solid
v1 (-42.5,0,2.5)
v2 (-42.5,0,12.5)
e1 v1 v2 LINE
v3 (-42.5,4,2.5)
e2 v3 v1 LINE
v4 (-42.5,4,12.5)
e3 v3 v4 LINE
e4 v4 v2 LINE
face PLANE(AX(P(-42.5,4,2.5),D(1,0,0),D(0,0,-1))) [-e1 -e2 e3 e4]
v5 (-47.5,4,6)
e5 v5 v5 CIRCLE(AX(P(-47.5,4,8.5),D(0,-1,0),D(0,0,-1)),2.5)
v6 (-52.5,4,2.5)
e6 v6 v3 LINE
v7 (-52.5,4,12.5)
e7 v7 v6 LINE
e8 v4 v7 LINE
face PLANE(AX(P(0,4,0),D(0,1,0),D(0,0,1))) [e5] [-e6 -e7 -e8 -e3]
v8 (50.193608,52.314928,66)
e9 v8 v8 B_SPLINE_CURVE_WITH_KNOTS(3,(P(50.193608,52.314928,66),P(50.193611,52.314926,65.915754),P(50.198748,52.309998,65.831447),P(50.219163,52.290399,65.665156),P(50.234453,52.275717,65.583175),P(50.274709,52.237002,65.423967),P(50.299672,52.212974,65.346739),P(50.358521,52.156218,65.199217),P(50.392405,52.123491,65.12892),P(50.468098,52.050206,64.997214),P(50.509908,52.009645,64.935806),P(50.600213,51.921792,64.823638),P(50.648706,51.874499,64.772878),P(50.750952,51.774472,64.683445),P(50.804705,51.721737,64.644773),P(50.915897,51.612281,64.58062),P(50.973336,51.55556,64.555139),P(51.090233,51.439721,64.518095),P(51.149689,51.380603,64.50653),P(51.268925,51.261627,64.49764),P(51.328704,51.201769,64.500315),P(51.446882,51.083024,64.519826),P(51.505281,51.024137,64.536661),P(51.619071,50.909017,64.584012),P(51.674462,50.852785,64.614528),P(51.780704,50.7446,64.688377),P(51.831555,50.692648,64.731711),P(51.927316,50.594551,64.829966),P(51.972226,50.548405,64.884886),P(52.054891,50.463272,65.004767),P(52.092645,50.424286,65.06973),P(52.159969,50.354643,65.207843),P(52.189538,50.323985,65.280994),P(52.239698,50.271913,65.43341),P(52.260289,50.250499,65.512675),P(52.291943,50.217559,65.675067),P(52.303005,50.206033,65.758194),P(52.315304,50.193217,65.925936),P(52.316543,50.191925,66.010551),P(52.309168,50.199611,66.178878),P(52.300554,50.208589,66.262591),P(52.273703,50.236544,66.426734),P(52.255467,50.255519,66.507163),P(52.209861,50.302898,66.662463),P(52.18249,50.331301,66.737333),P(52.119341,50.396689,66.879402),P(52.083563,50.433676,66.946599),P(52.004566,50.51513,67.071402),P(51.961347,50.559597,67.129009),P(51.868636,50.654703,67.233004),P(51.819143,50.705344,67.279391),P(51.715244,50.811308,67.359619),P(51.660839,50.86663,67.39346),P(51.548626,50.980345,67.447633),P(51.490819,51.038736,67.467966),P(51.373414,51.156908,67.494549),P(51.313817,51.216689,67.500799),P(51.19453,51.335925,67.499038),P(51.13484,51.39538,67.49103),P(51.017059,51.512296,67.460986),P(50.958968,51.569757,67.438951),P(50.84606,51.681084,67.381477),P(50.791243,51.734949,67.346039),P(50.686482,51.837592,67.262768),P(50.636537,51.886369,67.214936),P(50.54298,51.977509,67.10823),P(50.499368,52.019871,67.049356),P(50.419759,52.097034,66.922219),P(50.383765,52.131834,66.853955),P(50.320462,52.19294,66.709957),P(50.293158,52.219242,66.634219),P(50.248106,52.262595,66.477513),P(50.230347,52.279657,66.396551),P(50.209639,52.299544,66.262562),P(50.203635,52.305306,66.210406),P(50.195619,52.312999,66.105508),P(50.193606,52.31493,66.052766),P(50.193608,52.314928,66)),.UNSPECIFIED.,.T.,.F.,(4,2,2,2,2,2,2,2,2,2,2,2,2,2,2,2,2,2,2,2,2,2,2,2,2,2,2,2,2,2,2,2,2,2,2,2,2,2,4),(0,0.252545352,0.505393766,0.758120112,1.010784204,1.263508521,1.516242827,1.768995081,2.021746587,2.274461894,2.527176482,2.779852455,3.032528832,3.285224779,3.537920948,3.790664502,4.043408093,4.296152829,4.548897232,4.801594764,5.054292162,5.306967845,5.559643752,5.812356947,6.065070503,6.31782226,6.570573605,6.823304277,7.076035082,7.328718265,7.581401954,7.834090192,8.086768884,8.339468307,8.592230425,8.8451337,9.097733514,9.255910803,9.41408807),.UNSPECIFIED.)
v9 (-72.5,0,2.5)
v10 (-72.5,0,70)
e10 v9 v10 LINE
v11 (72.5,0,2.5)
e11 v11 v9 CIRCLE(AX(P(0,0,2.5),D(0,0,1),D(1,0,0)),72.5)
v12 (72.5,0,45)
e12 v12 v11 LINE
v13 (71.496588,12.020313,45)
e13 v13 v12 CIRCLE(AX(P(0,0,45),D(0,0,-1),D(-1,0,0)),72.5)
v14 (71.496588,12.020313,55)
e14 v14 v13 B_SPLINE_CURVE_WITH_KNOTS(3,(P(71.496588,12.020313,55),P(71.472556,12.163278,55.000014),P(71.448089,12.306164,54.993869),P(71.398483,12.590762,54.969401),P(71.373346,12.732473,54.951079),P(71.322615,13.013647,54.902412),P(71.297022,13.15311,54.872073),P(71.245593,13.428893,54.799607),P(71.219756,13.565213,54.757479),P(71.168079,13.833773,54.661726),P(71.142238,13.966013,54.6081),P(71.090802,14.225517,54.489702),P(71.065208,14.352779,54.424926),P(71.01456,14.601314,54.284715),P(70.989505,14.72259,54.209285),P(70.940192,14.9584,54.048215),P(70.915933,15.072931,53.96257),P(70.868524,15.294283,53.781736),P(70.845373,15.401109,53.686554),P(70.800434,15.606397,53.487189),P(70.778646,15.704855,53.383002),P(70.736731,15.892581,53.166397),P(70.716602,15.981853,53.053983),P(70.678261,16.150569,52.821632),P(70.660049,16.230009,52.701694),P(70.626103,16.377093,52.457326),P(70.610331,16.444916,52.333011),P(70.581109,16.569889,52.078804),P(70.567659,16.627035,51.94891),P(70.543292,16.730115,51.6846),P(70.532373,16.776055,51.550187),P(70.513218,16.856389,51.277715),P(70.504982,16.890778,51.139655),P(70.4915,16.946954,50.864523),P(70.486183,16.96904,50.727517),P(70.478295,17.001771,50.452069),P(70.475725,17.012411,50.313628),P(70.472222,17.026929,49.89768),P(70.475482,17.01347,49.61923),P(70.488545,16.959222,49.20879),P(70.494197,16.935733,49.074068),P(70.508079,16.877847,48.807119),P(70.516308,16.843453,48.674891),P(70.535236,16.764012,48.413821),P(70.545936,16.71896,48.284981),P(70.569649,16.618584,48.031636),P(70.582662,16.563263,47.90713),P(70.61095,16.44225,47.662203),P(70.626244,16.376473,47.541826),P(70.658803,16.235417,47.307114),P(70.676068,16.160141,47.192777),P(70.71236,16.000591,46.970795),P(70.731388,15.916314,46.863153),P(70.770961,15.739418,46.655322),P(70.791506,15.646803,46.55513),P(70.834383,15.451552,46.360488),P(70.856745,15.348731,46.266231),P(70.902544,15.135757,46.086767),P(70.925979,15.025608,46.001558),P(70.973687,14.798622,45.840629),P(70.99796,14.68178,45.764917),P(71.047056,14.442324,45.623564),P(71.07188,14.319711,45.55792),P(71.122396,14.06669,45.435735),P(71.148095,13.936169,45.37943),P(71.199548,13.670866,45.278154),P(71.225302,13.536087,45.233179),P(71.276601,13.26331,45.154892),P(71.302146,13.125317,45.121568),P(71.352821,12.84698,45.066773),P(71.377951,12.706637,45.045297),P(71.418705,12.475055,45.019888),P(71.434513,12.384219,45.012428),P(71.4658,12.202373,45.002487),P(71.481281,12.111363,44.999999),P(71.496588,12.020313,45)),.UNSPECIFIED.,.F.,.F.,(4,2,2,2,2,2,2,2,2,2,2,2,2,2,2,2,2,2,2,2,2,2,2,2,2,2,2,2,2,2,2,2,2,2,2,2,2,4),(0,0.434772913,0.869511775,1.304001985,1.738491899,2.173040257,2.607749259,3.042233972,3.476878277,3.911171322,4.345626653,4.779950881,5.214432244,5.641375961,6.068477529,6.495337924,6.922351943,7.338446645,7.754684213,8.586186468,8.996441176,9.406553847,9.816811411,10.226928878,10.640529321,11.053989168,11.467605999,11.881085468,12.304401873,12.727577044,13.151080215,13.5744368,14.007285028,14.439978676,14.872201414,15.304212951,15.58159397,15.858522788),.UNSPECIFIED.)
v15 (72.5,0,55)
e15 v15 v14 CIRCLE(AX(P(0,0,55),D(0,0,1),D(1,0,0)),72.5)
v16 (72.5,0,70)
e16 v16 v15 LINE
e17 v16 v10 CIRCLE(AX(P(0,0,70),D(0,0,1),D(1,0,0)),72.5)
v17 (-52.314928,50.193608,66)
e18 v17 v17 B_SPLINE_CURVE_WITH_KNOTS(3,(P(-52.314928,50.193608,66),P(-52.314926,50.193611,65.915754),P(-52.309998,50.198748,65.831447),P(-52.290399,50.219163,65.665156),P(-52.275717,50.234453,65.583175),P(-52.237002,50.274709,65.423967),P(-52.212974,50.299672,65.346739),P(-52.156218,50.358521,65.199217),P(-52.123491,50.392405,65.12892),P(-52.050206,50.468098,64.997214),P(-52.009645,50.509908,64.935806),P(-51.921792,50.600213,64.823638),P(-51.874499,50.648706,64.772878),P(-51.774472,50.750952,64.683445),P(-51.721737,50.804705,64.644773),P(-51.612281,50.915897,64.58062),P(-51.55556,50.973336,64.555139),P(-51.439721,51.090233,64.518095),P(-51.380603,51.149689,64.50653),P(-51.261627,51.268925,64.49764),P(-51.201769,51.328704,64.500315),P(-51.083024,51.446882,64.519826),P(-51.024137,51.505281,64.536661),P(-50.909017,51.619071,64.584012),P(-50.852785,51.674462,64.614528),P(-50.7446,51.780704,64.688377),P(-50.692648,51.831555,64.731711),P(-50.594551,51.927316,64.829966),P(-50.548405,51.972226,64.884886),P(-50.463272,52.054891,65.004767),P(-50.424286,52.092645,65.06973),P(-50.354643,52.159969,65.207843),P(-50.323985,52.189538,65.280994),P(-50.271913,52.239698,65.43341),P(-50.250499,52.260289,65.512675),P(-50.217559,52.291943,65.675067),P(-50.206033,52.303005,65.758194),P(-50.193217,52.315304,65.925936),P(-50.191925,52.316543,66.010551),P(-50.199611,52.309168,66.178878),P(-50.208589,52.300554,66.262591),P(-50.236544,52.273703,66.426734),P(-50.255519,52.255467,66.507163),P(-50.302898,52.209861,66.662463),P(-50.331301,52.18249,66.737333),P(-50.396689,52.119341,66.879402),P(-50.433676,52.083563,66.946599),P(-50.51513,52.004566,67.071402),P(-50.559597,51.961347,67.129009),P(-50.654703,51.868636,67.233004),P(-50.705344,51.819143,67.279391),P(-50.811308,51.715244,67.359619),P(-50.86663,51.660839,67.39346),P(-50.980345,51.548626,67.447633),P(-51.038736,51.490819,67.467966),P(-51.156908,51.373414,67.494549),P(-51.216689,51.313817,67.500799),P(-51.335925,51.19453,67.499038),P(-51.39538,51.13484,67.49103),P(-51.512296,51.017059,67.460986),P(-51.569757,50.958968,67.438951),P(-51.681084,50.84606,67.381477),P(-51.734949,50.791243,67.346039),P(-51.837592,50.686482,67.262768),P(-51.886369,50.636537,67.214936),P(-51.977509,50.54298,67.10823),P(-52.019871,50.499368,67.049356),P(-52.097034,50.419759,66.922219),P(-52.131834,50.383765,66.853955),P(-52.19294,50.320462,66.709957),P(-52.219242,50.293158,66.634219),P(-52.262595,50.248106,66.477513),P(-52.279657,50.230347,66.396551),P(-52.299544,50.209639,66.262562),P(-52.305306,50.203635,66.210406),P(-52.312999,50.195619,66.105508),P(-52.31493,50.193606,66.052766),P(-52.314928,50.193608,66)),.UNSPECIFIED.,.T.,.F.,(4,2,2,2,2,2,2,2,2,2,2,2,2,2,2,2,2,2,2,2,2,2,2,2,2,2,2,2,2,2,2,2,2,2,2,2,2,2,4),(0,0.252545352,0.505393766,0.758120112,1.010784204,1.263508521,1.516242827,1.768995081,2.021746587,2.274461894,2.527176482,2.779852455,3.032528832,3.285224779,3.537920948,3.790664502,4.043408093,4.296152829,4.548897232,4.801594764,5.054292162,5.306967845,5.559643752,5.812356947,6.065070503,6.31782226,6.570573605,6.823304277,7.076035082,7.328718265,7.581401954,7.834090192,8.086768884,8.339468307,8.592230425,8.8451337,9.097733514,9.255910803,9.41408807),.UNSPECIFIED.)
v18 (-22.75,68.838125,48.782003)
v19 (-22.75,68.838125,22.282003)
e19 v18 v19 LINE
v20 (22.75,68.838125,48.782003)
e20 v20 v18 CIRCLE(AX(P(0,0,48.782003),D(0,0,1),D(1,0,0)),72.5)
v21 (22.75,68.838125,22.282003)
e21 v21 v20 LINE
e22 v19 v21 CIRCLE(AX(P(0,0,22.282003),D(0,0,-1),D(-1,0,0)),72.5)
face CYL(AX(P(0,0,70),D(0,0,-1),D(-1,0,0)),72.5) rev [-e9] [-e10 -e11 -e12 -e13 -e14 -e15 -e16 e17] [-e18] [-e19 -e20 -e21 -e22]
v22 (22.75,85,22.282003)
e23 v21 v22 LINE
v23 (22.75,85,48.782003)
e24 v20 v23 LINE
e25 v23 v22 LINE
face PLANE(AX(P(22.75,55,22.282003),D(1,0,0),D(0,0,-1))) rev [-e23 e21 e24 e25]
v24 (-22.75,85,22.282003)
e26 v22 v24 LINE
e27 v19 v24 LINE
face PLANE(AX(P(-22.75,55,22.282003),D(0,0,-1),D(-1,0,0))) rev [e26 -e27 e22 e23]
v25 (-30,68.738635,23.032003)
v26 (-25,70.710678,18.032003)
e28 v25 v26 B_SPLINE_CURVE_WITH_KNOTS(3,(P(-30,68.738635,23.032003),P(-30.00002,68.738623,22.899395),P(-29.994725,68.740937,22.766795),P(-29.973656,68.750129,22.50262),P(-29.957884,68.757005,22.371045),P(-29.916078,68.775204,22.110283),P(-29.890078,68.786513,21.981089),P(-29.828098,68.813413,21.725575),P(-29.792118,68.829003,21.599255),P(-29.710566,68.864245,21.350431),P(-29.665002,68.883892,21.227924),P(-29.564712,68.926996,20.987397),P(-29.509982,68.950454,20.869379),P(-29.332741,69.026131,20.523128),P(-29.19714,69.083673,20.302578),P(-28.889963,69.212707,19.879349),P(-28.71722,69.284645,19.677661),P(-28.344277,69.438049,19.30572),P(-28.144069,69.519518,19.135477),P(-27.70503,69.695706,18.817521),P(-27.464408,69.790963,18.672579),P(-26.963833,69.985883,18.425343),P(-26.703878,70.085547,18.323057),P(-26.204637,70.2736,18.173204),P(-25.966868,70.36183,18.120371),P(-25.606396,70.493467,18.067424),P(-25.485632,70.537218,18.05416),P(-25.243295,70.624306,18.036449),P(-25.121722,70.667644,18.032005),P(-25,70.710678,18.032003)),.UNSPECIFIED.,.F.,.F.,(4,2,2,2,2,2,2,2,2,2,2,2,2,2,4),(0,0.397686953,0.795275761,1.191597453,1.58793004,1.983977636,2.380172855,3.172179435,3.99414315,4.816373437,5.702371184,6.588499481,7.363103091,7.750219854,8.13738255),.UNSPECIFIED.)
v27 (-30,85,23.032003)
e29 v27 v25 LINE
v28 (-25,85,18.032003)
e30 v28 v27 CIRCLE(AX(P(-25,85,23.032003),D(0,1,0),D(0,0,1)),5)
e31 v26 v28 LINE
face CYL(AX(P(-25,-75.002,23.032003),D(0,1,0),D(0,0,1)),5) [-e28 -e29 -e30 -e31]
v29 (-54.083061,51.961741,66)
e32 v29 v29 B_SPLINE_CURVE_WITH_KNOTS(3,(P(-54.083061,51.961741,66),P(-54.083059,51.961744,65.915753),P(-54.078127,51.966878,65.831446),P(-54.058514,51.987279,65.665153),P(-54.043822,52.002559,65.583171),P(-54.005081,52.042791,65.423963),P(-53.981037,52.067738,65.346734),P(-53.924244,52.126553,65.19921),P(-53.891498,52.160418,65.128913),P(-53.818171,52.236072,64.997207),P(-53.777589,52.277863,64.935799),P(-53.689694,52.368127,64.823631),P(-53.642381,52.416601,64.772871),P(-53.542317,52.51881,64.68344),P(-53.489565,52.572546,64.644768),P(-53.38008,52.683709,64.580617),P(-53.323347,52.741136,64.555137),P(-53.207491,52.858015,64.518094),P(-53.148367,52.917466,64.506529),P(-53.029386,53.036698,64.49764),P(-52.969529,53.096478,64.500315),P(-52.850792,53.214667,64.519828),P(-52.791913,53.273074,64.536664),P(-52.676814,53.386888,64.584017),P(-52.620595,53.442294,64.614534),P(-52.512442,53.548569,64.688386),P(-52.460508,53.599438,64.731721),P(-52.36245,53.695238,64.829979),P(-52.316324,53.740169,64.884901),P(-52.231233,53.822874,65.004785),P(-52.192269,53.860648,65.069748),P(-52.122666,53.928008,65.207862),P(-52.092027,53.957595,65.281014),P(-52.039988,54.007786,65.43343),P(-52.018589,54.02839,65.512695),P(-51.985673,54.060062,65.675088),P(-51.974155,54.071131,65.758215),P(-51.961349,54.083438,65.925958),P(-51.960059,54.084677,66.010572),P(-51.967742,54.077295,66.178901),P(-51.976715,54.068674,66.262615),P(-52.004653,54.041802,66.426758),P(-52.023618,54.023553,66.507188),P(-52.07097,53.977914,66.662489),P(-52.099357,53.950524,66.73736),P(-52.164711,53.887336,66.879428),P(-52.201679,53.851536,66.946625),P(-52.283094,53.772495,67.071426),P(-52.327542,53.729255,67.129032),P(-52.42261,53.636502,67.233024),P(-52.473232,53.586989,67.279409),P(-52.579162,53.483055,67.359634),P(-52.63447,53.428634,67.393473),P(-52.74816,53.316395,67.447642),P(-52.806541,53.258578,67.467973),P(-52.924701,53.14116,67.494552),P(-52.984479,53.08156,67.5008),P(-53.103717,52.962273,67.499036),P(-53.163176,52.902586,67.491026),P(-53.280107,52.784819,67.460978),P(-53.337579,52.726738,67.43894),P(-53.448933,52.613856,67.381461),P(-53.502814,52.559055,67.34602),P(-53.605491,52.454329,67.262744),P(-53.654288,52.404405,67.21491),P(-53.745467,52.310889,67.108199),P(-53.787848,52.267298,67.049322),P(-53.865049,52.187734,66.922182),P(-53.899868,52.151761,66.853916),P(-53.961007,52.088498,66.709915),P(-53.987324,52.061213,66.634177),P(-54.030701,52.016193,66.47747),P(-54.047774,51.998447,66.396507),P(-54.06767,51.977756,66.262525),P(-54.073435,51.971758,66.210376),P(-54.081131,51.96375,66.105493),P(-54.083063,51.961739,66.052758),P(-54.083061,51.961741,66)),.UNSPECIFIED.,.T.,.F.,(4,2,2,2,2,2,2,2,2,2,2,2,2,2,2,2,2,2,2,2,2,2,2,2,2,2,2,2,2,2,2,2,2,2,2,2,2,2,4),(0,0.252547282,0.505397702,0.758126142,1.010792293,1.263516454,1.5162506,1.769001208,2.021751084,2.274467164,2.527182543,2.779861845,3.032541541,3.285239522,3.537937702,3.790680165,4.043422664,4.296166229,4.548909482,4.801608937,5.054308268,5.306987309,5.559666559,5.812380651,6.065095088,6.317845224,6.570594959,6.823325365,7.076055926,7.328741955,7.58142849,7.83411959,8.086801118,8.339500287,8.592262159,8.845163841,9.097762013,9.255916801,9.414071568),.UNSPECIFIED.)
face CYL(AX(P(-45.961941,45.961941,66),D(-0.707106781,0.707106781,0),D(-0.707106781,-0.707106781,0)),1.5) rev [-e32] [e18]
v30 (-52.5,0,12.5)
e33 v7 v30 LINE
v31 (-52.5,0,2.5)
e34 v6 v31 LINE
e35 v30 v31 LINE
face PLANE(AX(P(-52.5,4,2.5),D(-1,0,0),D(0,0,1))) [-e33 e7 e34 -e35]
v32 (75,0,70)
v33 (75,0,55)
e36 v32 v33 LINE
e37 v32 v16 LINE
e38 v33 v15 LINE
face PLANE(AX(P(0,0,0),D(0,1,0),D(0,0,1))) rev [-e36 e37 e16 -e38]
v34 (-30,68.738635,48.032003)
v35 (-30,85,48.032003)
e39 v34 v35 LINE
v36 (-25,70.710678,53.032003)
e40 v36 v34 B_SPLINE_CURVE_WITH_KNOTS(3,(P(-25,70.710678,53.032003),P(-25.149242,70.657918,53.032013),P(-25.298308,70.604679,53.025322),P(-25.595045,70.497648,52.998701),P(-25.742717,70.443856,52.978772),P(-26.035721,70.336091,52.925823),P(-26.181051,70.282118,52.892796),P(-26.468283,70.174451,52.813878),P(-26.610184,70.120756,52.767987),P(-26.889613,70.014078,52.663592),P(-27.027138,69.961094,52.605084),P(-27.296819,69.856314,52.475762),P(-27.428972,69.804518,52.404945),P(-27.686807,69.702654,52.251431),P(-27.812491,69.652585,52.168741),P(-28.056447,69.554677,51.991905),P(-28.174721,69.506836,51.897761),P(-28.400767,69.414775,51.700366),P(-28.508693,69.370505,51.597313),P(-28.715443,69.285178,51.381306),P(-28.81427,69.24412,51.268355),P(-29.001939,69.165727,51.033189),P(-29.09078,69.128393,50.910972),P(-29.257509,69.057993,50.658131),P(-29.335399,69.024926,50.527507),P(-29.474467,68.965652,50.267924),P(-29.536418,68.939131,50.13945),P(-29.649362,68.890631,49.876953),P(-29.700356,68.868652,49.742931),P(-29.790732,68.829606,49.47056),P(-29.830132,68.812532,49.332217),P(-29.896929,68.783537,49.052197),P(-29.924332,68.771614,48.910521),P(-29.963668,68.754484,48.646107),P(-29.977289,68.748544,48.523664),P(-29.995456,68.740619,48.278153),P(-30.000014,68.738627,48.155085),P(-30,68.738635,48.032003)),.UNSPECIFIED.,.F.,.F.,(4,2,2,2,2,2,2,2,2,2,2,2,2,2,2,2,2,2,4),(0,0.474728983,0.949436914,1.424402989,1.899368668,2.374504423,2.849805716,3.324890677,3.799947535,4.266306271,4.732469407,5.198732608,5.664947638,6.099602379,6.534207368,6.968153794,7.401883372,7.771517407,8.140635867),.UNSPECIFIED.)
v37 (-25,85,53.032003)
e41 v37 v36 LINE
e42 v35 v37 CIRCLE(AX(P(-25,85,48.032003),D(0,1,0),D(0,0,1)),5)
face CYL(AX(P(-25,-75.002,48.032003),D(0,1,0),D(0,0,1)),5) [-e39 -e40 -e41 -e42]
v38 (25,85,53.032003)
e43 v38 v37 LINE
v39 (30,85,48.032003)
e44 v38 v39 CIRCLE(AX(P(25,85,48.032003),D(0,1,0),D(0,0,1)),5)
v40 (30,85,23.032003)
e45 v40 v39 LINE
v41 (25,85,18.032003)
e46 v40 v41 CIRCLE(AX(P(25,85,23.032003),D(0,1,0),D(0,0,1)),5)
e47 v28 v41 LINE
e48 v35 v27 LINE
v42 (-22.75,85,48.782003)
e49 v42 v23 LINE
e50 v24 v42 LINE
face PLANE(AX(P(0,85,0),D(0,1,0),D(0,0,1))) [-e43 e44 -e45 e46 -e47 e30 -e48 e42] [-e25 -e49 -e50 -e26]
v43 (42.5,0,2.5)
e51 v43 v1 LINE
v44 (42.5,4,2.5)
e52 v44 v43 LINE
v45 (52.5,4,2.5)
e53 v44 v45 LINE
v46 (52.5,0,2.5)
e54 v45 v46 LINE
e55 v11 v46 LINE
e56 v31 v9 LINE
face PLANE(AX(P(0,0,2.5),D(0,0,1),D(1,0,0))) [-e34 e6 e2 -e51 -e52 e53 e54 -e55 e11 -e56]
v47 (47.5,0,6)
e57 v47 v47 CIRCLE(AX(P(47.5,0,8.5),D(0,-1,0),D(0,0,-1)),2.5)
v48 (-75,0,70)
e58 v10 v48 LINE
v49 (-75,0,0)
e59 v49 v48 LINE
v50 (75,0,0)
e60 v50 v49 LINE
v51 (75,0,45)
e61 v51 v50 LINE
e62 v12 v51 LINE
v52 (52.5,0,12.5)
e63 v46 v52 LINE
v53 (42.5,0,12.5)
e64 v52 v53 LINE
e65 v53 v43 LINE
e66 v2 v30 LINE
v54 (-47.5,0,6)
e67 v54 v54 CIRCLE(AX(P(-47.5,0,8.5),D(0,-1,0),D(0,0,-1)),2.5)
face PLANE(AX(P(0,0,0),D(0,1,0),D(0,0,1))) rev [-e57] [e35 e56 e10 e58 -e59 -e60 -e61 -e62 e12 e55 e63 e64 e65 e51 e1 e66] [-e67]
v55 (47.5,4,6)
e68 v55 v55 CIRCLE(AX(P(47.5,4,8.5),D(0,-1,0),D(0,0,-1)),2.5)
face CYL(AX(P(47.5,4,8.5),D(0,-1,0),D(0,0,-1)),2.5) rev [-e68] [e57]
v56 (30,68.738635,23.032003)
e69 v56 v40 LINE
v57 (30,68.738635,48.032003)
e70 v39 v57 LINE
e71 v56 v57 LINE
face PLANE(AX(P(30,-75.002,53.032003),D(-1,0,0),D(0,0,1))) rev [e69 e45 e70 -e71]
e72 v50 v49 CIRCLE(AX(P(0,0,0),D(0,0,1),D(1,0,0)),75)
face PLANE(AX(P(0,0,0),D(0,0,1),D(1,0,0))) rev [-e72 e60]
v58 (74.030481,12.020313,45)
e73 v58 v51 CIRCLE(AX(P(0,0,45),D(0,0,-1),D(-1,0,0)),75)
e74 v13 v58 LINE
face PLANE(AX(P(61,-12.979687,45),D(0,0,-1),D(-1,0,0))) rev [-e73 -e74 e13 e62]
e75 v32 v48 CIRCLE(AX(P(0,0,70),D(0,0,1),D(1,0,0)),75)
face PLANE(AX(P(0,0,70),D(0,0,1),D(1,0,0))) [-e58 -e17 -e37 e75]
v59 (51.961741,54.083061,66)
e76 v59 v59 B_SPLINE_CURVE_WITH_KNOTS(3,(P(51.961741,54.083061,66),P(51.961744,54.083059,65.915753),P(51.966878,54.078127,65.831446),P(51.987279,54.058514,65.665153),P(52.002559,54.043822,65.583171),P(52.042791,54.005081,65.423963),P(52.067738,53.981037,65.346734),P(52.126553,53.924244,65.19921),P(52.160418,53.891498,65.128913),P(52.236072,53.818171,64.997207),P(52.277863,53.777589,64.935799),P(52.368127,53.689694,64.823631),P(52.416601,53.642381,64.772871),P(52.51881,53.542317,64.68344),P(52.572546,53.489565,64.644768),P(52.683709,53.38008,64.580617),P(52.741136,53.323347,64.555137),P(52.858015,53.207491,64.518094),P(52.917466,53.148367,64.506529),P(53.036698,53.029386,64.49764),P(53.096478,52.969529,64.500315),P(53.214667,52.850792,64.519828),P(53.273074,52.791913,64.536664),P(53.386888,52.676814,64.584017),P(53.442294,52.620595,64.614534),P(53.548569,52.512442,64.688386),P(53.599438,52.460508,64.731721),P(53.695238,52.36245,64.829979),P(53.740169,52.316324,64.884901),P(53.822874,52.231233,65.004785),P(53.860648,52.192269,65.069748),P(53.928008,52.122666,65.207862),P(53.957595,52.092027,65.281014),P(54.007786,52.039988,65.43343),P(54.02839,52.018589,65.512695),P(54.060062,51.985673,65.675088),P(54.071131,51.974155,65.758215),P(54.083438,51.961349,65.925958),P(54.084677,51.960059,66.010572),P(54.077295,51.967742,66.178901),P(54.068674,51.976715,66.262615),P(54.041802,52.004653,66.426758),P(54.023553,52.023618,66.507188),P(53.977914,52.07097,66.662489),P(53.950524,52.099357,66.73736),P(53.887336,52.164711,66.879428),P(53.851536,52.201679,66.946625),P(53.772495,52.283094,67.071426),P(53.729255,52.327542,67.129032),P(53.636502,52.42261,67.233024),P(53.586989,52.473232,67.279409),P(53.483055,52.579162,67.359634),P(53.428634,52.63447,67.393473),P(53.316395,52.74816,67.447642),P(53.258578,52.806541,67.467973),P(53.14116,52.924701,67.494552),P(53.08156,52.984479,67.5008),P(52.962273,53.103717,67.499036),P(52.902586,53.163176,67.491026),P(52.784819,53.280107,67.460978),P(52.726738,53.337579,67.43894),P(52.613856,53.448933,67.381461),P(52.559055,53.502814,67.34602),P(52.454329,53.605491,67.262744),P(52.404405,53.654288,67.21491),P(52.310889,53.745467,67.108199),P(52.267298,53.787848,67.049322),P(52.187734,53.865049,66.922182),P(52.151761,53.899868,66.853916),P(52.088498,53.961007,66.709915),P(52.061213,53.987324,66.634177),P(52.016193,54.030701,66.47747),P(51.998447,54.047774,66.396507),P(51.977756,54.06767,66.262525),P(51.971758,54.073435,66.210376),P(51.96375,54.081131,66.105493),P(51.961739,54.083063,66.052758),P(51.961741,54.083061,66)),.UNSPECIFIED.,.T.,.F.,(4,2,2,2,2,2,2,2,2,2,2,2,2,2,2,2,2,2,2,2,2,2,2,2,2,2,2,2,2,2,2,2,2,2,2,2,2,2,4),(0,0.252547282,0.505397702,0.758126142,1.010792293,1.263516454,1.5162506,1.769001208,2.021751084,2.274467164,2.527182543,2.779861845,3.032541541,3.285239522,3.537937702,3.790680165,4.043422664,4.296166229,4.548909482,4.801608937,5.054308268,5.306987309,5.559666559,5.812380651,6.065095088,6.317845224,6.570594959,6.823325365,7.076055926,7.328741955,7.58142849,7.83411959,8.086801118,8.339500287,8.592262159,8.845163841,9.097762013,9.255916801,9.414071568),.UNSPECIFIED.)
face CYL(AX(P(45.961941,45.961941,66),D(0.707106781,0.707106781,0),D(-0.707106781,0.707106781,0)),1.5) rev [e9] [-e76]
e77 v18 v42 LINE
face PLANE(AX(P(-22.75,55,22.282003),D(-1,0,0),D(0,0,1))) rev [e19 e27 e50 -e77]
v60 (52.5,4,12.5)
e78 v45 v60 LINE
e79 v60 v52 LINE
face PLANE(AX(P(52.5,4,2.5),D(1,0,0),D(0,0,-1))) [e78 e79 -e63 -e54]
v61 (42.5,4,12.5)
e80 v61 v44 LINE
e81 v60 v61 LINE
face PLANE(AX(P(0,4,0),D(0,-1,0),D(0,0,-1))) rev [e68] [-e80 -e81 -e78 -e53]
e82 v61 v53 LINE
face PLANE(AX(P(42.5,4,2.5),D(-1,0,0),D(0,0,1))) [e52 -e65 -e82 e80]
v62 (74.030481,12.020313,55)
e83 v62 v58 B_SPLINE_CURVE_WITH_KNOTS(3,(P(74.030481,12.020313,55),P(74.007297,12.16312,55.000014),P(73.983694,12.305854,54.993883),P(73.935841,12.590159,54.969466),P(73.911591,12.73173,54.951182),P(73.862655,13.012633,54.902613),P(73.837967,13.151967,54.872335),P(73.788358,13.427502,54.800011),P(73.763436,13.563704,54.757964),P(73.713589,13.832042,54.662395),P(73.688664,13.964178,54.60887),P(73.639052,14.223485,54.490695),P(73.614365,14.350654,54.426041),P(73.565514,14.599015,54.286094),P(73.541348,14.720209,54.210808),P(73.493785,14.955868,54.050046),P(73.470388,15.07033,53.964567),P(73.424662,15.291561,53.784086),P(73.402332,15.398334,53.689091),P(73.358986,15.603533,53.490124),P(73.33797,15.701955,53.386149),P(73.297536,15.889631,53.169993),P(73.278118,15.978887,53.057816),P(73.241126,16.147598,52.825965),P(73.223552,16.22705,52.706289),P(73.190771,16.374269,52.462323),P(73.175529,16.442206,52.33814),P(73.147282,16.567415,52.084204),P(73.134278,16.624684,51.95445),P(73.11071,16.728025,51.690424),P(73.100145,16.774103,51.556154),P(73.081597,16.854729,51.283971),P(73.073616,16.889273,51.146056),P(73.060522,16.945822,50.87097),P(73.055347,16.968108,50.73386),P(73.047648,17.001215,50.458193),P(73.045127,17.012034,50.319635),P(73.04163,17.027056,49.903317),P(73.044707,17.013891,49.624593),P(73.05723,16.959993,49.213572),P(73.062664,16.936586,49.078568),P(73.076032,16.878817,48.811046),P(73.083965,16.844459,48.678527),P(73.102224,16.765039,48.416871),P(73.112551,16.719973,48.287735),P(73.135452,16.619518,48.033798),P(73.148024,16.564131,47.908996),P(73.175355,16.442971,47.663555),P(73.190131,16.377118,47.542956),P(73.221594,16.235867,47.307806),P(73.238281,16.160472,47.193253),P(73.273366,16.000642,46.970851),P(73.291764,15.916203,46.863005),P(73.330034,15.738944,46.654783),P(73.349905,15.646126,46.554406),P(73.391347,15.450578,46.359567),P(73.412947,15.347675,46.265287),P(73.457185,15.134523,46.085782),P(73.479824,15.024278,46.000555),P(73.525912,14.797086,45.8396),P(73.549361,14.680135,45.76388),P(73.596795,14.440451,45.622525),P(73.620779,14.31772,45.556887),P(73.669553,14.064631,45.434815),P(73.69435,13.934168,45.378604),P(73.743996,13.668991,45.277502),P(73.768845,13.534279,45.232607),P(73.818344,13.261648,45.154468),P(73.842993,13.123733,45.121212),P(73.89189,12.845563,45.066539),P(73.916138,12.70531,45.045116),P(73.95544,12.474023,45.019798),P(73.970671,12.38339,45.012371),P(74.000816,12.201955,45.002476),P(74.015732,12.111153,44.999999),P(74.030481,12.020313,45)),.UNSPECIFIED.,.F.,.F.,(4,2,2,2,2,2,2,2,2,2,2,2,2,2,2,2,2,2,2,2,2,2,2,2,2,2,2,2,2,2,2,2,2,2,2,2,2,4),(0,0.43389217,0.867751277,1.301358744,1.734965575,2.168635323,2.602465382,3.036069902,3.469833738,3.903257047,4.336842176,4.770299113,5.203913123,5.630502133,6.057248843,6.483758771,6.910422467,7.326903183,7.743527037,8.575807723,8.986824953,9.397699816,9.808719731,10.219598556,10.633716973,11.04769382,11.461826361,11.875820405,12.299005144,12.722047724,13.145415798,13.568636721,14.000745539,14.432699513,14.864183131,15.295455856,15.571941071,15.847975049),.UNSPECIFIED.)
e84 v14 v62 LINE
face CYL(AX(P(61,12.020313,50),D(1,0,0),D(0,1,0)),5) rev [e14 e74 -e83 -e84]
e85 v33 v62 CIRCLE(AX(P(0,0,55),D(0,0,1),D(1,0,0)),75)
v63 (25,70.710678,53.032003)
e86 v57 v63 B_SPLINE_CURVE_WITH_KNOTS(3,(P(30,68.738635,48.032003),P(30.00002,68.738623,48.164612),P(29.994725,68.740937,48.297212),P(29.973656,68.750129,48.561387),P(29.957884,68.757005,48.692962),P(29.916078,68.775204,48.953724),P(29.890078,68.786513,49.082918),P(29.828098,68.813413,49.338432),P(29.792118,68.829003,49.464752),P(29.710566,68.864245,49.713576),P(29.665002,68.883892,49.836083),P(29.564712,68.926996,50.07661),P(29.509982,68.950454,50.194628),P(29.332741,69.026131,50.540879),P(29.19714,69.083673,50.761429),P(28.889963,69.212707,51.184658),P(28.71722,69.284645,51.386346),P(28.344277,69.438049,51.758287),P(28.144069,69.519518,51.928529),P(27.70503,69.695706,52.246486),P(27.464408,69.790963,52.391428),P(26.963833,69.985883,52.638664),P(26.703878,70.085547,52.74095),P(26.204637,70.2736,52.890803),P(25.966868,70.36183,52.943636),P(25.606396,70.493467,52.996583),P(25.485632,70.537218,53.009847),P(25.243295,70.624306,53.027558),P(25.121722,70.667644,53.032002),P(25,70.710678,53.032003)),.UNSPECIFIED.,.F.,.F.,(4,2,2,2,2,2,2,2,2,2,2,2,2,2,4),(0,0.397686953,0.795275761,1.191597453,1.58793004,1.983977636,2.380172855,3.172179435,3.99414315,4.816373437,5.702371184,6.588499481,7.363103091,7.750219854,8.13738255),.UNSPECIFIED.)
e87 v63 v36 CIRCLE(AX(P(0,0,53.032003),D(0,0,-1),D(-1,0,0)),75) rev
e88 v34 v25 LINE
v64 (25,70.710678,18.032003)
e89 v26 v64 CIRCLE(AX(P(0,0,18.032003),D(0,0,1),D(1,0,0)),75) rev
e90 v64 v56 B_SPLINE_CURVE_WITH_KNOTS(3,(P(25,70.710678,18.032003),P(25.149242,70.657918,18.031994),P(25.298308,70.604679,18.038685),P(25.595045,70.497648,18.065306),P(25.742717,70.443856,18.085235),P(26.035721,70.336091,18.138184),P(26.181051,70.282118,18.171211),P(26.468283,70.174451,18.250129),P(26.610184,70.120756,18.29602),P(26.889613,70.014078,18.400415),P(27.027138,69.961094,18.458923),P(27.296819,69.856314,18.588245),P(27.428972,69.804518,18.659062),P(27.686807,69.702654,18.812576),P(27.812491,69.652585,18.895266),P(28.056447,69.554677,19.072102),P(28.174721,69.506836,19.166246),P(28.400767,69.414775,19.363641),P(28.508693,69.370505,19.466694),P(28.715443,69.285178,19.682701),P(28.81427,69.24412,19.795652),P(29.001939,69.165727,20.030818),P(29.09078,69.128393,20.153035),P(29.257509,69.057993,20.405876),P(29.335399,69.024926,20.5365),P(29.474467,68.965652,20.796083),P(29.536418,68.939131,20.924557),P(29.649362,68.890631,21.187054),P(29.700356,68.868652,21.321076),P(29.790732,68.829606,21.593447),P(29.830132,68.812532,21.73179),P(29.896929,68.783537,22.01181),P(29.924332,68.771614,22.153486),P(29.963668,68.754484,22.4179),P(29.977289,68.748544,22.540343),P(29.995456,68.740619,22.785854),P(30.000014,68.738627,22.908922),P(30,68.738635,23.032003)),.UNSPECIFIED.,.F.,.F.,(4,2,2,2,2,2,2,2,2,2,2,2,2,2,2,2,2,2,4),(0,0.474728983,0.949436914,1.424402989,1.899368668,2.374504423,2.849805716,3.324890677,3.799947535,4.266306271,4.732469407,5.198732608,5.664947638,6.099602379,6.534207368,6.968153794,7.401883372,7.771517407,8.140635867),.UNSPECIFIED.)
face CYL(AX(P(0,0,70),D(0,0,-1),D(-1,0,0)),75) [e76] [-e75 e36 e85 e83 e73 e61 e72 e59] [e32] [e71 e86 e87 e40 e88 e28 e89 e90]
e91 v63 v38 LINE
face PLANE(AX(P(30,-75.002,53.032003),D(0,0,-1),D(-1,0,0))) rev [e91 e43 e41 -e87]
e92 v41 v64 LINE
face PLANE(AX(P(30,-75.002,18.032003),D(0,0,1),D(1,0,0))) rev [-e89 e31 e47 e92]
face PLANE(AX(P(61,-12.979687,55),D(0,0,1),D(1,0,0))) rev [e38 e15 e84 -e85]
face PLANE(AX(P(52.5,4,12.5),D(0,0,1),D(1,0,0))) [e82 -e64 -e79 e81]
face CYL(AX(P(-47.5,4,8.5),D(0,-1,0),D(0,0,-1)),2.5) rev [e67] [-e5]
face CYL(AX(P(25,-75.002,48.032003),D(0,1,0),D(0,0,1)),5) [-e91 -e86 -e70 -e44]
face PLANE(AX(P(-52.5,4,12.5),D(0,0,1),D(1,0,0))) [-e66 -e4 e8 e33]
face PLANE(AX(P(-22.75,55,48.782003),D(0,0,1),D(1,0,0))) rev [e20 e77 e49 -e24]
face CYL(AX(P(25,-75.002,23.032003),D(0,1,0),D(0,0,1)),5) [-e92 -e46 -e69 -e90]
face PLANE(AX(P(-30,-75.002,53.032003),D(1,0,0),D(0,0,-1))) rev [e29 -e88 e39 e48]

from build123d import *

# Parameters (mm, degrees)
SZKIC1_R                         = 75
DODANIE_WYCI_GNI_CIE1_DEPTH      = 70
SKORUPA1_T                       = -2.5
SZKIC3_W                         = 13
SZKIC3_H                         = 21
WYTNIJ_WYCI_GNI_CIE1_DEPTH       = 60
SZKIC4_W                         = 9
SZKIC4_H                         = 11
WYTNIJ_WYCI_GNI_CIE2_DEPTH       = 60
DODANIE_WYCI_GNI_CIE2_REACH      = 192.066
DODANIE_WYCI_GNI_CIE2_END_RADIUS = 75
SZKIC7_W                         = 60
SZKIC7_H                         = 35
SZKIC8_W                         = 45.5
SZKIC8_H                         = 26.5
WYTNIJ_WYCI_GNI_CIE4_DEPTH       = 30
ZAOKR_GLENIE1_R                  = 5
WYTNIJ_WYCI_GNI_CIE5_DEPTH       = 14
SZKIC10_R                        = 1.5
WYTNIJ_WYCI_GNI_CIE6_DEPTH       = 10
SZYK_KO_OWY1_COUNT               = 4
PRZECI_CIE1_START                = -75.0000001
PRZECI_CIE1_OUTLINE_W            = 152
PRZECI_CIE1_OUTLINE_H            = 70
PRZECI_CIE1_OUTLINE_W_2          = 13
PRZECI_CIE1_OUTLINE_H_2          = 21
PRZECI_CIE1_OUTLINE_W_3          = 9
PRZECI_CIE1_OUTLINE_H_3          = 11
PRZECI_CIE1_DEPTH                = 75.0000001
SZKIC11_W                        = 10
SZKIC11_H                        = 10
SZKIC11_R                        = 2.5
DODANIE_WYCI_GNI_CIE3_DEPTH      = 4


# Read off the part's stored shape, not the designer's step: Przecięcie1
with BuildPart() as part:
    # Szkic1 → Dodanie-wyciągnięcie1 (new body)
    with BuildSketch(Plane.XY):
        Circle(SZKIC1_R)
    extrude(amount=DODANIE_WYCI_GNI_CIE1_DEPTH)

    # Skorupa1
    skorupa1_openings = [part.faces().sort_by_distance(p)[0] for p in [
        (0, 0, 70),
    ]]
    offset(amount=SKORUPA1_T, openings=skorupa1_openings, kind=Kind.INTERSECTION)

    # Szkic3 → Wytnij-wyciągnięcie1 (cut)
    with BuildSketch(Plane(origin=(0, -75, 0), x_dir=(-1, 0, 0), z_dir=(0, -1, 0))):
        with Locations((0, -35)):
            Rectangle(SZKIC3_W, SZKIC3_H)
    extrude(amount=-WYTNIJ_WYCI_GNI_CIE1_DEPTH, mode=Mode.SUBTRACT)

    # Szkic4 → Wytnij-wyciągnięcie2 (cut)
    with BuildSketch(Plane(origin=(0, -75, 0), x_dir=(-1, 0, 0), z_dir=(0, -1, 0))):
        with Locations((0, -14)):
            Rectangle(SZKIC4_W, SZKIC4_H)
    extrude(amount=-WYTNIJ_WYCI_GNI_CIE2_DEPTH, mode=Mode.SUBTRACT)

    # Dodanie-wyciągnięcie2: up to this cylinder (the profile starts outside it)
    dodanie_wyci_gni_cie2_end = Plane(origin=(0, 0, 35.532003), z_dir=(0, 0, -1)) * Cylinder(DODANIE_WYCI_GNI_CIE2_END_RADIUS, 535.132, mode=Mode.PRIVATE)
    # Szkic7 → Dodanie-wyciągnięcie2 (add, up to the surface)
    with BuildSketch(Plane(origin=(0, 85, 0), x_dir=(-1, 0, 0), z_dir=(0, -1, 0)), mode=Mode.PRIVATE) as dodanie_wyci_gni_cie2_sk1:
        with Locations((0, -35.532003496)):
            Rectangle(SZKIC7_W, SZKIC7_H)
    dodanie_wyci_gni_cie2_tool1 = extrude(dodanie_wyci_gni_cie2_sk1.sketch, amount=DODANIE_WYCI_GNI_CIE2_REACH, mode=Mode.PRIVATE) - dodanie_wyci_gni_cie2_end
    add(dodanie_wyci_gni_cie2_tool1.solids().sort_by_distance((0, 85, 35.532003))[0])

    # Szkic8 → Wytnij-wyciągnięcie4 (cut)
    with BuildSketch(Plane(origin=(0, 85, 0), x_dir=(1, 0, 0), z_dir=(0, 1, 0))):
        with Locations((0, -35.532003496)):
            Rectangle(SZKIC8_W, SZKIC8_H)
    extrude(amount=-WYTNIJ_WYCI_GNI_CIE4_DEPTH, mode=Mode.SUBTRACT)

    # Zaokrąglenie1
    zaokr_glenie1_edges = [part.edges().sort_by_distance(p)[0] for p in [
        (-30, 76.869317712, 18.032003496),
        (-30, 76.869317712, 53.032003496),
        (30, 76.869317712, 18.032003496),
        (30, 76.869317712, 53.032003496),
    ]]
    fillet(zaokr_glenie1_edges, radius=ZAOKR_GLENIE1_R)

    # Szkic9 → Wytnij-wyciągnięcie5 (cut)
    with BuildSketch(Plane(origin=(75, 0, 0), x_dir=(0, 0, -1), z_dir=(1, 0, 0))):
        with BuildLine():
            Line((-55, -12.979686846), (-55, 12.020313154))
            ThreePointArc((-55, 12.020313154), (-50, 17.020313154), (-45, 12.020313154))
            Line((-45, 12.020313154), (-45, -12.979686846))
            ThreePointArc((-45, -12.979686846), (-50, -17.979686846), (-55, -12.979686846))
        make_face()
    extrude(amount=-WYTNIJ_WYCI_GNI_CIE5_DEPTH, mode=Mode.SUBTRACT)

    # Szkic10 → Wytnij-wyciągnięcie6 (cut)
    with BuildSketch(Plane(origin=(53.033008589, 53.033008589, 0), x_dir=(0, 0, -1), z_dir=(0.7071067811865512, 0.7071067811865438, 0))):
        with Locations(Location((-66, 0, 0), (0, 0, 90))):
            Circle(SZKIC10_R)
    wytnij_wyci_gni_cie6 = extrude(amount=-WYTNIJ_WYCI_GNI_CIE6_DEPTH, mode=Mode.SUBTRACT)

    # Szyk kołowy1: Wytnij-wyciągnięcie6 ×4 about axis
    szyk_ko_owy1_axis = Axis((0, 0, 70), (0, 0, -1))
    for i in range(1, SZYK_KO_OWY1_COUNT):
        add(wytnij_wyci_gni_cie6.rotate(szyk_ko_owy1_axis, i * 360 / SZYK_KO_OWY1_COUNT), mode=Mode.SUBTRACT)

    # Przecięcie1 outline → Przecięcie1 (cut)
    with BuildSketch(Plane(origin=(0, 0, 0), x_dir=(1, 0, 0), z_dir=(0, 1, 0)).offset(PRZECI_CIE1_START)):
        with Locations((0, -35)):
            Rectangle(PRZECI_CIE1_OUTLINE_W, PRZECI_CIE1_OUTLINE_H)
        with Locations((0, -35)):
            Rectangle(PRZECI_CIE1_OUTLINE_W_2, PRZECI_CIE1_OUTLINE_H_2, mode=Mode.SUBTRACT)
        with Locations((0, -14)):
            Rectangle(PRZECI_CIE1_OUTLINE_W_3, PRZECI_CIE1_OUTLINE_H_3, mode=Mode.SUBTRACT)
    extrude(amount=PRZECI_CIE1_DEPTH, mode=Mode.SUBTRACT)

    # Szkic11 → Dodanie-wyciągnięcie3 (add)
    # profile 1 of 2: a face of its own
    with BuildSketch(Plane(origin=(0, 0, 0), x_dir=(-1, 0, 0), z_dir=(0, -1, 0))):
        with Locations((47.5, -7.5)):
            Rectangle(SZKIC11_W, SZKIC11_H)
        with Locations(Location((47.5, -8.5, 0), (0, 0, 90))):
            Circle(SZKIC11_R, mode=Mode.SUBTRACT)
    # profile 2 of 2: a face of its own
    with BuildSketch(Plane(origin=(0, 0, 0), x_dir=(-1, 0, 0), z_dir=(0, -1, 0))):
        with Locations((-47.5, -7.5)):
            Rectangle(SZKIC11_W, SZKIC11_H)
        with Locations(Location((-47.5, -8.5, 0), (0, 0, 90))):
            Circle(SZKIC11_R, mode=Mode.SUBTRACT)
    extrude(amount=-DODANIE_WYCI_GNI_CIE3_DEPTH)


solid = part.part
